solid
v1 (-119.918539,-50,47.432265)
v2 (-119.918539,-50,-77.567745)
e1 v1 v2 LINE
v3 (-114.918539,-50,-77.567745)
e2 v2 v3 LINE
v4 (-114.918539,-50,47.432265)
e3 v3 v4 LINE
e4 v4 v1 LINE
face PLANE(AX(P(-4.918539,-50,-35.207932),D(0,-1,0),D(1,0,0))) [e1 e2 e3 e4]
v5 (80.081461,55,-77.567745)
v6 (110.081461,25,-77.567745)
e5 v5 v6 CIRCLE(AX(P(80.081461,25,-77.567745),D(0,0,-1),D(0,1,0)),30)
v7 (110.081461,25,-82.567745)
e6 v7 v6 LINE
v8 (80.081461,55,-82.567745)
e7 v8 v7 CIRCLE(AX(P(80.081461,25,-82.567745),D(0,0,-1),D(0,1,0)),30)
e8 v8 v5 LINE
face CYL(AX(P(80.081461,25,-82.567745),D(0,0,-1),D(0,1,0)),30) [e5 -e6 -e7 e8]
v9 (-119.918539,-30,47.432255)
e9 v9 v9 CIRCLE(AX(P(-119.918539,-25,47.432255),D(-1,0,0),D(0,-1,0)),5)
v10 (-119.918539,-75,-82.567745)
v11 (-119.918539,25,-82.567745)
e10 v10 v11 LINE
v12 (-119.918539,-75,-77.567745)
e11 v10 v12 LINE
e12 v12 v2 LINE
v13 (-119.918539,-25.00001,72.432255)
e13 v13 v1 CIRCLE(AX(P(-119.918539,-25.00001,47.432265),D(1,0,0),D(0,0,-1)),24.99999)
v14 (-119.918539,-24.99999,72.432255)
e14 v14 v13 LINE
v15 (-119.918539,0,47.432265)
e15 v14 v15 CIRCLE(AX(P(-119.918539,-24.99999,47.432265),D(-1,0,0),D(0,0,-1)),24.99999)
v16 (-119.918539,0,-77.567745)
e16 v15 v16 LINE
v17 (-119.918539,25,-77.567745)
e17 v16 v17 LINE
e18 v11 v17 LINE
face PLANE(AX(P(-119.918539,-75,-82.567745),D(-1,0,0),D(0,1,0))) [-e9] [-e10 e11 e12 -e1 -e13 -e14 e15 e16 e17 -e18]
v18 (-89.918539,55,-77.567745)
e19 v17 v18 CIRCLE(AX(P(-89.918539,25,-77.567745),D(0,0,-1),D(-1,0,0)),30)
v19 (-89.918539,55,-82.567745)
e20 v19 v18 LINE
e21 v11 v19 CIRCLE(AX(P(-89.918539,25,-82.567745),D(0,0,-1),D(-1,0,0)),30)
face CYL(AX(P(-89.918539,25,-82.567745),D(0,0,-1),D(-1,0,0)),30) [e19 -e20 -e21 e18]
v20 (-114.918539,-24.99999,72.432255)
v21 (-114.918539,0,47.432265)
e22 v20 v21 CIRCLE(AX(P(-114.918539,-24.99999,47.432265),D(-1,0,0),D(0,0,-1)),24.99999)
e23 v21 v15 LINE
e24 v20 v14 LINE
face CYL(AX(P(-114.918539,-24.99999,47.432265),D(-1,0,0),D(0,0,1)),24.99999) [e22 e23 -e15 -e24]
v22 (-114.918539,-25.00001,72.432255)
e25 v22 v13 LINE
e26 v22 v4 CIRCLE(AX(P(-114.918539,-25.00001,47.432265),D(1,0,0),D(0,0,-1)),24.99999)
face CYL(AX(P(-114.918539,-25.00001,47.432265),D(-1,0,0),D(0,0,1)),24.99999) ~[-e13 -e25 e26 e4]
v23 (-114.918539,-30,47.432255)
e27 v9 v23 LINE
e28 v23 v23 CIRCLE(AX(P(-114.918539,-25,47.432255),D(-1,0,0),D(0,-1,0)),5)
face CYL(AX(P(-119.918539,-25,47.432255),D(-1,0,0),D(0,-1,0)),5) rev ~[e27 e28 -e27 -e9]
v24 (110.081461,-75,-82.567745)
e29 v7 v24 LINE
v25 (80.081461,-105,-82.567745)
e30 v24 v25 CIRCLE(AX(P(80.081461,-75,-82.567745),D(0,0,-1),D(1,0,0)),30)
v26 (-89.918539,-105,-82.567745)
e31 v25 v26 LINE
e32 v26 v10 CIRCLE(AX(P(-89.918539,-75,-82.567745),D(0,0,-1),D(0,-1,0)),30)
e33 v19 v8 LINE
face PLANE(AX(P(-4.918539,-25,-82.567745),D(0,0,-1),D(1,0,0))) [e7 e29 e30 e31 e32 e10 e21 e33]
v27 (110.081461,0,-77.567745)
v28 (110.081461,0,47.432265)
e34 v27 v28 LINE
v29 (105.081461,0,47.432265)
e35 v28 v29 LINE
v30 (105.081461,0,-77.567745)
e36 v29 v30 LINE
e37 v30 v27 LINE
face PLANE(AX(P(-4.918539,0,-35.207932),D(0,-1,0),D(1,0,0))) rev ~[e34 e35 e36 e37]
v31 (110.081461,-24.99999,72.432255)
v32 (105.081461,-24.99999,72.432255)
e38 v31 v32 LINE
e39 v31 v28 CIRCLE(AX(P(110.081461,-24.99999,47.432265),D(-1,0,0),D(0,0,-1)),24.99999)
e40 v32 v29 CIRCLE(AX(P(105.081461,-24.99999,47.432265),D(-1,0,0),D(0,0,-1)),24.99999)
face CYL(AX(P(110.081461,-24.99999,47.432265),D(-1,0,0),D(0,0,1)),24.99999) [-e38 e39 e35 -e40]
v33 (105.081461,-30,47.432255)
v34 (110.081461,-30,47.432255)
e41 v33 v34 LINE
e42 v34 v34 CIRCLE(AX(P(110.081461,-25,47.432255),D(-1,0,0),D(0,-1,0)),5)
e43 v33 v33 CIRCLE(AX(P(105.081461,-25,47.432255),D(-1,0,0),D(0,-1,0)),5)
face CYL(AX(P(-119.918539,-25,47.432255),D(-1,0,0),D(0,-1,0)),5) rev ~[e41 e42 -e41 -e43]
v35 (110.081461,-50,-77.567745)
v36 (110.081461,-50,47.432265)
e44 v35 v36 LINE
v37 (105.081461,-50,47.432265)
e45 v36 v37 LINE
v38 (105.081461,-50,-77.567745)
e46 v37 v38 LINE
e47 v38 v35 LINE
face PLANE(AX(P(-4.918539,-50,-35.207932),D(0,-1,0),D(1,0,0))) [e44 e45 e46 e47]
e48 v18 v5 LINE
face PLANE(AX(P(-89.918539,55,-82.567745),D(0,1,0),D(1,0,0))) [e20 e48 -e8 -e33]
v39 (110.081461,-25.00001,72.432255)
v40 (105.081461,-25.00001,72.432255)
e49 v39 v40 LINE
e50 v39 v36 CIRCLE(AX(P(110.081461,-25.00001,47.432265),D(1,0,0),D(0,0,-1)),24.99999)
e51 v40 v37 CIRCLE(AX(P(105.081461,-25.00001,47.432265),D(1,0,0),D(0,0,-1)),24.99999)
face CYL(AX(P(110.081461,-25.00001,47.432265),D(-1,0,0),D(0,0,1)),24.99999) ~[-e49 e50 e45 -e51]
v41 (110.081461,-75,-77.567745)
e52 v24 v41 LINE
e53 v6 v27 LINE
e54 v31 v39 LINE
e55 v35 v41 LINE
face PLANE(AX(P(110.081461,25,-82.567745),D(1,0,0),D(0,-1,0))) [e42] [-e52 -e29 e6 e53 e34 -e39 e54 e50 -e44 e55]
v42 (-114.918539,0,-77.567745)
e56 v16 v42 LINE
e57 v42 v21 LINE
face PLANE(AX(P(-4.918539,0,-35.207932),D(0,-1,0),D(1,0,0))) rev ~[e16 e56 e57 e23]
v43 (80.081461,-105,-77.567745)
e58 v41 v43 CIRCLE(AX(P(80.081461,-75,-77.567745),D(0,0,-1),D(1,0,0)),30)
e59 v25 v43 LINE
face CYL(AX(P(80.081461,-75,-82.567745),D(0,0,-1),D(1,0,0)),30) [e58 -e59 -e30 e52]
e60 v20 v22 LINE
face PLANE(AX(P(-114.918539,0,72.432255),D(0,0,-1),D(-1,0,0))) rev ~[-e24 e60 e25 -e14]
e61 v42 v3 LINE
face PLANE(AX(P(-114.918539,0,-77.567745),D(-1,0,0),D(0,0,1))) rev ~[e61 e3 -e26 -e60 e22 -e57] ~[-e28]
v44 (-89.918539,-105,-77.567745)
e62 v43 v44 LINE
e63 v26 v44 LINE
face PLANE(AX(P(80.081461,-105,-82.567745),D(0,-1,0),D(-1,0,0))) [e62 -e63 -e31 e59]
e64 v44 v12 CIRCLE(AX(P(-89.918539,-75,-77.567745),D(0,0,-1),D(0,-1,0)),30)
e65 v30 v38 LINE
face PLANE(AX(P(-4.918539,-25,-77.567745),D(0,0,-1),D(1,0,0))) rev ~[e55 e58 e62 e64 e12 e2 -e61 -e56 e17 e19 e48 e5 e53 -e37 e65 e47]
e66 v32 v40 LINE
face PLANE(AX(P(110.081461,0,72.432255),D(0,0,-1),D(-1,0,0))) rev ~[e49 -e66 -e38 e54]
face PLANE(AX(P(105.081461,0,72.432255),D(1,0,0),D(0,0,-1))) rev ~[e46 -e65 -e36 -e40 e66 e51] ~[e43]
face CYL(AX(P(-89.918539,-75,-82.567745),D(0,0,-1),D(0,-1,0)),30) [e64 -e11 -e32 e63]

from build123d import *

# Parameters (mm, degrees)
F1_DEPTH = 50
F2_R     = 24.99999
F3_R     = 5
F4_DEPTH = 230.001
F6_DEPTH = 5


# Not quite as in the source:
# - a fillet or chamfer is up to 0.001 mm smaller than in the source, because OpenCascade refuses the exact size


with BuildPart() as f1:
    # F0 (on Front) → F1 (new body)
    with BuildSketch(Plane.XZ):
        Polygon((-119.9185385572, 72.4322550792), (-119.9185385572, -82.5677449208), (110.0814614428, -82.5677449208), (110.0814614428, 72.4322550792), (105.0814614428, 72.4322550792), (105.0814614428, -77.5677449208), (-114.9185385572, -77.5677449208), (-114.9185385572, 72.4322550792), align=None)
    extrude(amount=F1_DEPTH)

    # F2 (radius 25 in the source; OpenCascade refuses exactly that, so slightly less here)
    f2_edges = [f1.edges().sort_by_distance(p)[0] for p in [
        (-117.418539, -50, 72.432255),
        (-117.418539, 0, 72.432255),
        (107.581461, -50, 72.432255),
        (107.581461, 0, 72.432255),
    ]]
    fillet(f2_edges, radius=F2_R)

    # F3 (on face) → F4 (cut, through all)
    with BuildSketch(Plane(origin=(-119.9185385572, 0, 0), x_dir=(0, -1, 0), z_dir=(-1, 0, 0))):
        with Locations((25, 47.4322550792)):
            Circle(F3_R)
    extrude(amount=-F4_DEPTH, mode=Mode.SUBTRACT)

    # F5 (on face) → F6 (join)
    with BuildSketch(Plane(origin=(0, 0, -82.5677449208), x_dir=(1, 0, 0), z_dir=(0, 0, -1))):
        with BuildLine():
            Line((80.0814614428, 105), (-89.9185385572, 105))
            ThreePointArc((-89.9185385572, 105), (-111.1317419928, 96.2132034356), (-119.9185385572, 75))
            Line((-119.9185385572, 75), (-119.9185385572, -25))
            ThreePointArc((-119.9185385572, -25), (-111.1317419928, -46.2132034356), (-89.9185385572, -55))
            Line((-89.9185385572, -55), (80.0814614428, -55))
            ThreePointArc((80.0814614428, -55), (101.2946648784, -46.2132034356), (110.0814614428, -25))
            Line((110.0814614428, -25), (110.0814614428, 75))
            ThreePointArc((110.0814614428, 75), (101.2946648784, 96.2132034356), (80.0814614428, 105))
        make_face()
    extrude(amount=-F6_DEPTH)


solid = f1.part
